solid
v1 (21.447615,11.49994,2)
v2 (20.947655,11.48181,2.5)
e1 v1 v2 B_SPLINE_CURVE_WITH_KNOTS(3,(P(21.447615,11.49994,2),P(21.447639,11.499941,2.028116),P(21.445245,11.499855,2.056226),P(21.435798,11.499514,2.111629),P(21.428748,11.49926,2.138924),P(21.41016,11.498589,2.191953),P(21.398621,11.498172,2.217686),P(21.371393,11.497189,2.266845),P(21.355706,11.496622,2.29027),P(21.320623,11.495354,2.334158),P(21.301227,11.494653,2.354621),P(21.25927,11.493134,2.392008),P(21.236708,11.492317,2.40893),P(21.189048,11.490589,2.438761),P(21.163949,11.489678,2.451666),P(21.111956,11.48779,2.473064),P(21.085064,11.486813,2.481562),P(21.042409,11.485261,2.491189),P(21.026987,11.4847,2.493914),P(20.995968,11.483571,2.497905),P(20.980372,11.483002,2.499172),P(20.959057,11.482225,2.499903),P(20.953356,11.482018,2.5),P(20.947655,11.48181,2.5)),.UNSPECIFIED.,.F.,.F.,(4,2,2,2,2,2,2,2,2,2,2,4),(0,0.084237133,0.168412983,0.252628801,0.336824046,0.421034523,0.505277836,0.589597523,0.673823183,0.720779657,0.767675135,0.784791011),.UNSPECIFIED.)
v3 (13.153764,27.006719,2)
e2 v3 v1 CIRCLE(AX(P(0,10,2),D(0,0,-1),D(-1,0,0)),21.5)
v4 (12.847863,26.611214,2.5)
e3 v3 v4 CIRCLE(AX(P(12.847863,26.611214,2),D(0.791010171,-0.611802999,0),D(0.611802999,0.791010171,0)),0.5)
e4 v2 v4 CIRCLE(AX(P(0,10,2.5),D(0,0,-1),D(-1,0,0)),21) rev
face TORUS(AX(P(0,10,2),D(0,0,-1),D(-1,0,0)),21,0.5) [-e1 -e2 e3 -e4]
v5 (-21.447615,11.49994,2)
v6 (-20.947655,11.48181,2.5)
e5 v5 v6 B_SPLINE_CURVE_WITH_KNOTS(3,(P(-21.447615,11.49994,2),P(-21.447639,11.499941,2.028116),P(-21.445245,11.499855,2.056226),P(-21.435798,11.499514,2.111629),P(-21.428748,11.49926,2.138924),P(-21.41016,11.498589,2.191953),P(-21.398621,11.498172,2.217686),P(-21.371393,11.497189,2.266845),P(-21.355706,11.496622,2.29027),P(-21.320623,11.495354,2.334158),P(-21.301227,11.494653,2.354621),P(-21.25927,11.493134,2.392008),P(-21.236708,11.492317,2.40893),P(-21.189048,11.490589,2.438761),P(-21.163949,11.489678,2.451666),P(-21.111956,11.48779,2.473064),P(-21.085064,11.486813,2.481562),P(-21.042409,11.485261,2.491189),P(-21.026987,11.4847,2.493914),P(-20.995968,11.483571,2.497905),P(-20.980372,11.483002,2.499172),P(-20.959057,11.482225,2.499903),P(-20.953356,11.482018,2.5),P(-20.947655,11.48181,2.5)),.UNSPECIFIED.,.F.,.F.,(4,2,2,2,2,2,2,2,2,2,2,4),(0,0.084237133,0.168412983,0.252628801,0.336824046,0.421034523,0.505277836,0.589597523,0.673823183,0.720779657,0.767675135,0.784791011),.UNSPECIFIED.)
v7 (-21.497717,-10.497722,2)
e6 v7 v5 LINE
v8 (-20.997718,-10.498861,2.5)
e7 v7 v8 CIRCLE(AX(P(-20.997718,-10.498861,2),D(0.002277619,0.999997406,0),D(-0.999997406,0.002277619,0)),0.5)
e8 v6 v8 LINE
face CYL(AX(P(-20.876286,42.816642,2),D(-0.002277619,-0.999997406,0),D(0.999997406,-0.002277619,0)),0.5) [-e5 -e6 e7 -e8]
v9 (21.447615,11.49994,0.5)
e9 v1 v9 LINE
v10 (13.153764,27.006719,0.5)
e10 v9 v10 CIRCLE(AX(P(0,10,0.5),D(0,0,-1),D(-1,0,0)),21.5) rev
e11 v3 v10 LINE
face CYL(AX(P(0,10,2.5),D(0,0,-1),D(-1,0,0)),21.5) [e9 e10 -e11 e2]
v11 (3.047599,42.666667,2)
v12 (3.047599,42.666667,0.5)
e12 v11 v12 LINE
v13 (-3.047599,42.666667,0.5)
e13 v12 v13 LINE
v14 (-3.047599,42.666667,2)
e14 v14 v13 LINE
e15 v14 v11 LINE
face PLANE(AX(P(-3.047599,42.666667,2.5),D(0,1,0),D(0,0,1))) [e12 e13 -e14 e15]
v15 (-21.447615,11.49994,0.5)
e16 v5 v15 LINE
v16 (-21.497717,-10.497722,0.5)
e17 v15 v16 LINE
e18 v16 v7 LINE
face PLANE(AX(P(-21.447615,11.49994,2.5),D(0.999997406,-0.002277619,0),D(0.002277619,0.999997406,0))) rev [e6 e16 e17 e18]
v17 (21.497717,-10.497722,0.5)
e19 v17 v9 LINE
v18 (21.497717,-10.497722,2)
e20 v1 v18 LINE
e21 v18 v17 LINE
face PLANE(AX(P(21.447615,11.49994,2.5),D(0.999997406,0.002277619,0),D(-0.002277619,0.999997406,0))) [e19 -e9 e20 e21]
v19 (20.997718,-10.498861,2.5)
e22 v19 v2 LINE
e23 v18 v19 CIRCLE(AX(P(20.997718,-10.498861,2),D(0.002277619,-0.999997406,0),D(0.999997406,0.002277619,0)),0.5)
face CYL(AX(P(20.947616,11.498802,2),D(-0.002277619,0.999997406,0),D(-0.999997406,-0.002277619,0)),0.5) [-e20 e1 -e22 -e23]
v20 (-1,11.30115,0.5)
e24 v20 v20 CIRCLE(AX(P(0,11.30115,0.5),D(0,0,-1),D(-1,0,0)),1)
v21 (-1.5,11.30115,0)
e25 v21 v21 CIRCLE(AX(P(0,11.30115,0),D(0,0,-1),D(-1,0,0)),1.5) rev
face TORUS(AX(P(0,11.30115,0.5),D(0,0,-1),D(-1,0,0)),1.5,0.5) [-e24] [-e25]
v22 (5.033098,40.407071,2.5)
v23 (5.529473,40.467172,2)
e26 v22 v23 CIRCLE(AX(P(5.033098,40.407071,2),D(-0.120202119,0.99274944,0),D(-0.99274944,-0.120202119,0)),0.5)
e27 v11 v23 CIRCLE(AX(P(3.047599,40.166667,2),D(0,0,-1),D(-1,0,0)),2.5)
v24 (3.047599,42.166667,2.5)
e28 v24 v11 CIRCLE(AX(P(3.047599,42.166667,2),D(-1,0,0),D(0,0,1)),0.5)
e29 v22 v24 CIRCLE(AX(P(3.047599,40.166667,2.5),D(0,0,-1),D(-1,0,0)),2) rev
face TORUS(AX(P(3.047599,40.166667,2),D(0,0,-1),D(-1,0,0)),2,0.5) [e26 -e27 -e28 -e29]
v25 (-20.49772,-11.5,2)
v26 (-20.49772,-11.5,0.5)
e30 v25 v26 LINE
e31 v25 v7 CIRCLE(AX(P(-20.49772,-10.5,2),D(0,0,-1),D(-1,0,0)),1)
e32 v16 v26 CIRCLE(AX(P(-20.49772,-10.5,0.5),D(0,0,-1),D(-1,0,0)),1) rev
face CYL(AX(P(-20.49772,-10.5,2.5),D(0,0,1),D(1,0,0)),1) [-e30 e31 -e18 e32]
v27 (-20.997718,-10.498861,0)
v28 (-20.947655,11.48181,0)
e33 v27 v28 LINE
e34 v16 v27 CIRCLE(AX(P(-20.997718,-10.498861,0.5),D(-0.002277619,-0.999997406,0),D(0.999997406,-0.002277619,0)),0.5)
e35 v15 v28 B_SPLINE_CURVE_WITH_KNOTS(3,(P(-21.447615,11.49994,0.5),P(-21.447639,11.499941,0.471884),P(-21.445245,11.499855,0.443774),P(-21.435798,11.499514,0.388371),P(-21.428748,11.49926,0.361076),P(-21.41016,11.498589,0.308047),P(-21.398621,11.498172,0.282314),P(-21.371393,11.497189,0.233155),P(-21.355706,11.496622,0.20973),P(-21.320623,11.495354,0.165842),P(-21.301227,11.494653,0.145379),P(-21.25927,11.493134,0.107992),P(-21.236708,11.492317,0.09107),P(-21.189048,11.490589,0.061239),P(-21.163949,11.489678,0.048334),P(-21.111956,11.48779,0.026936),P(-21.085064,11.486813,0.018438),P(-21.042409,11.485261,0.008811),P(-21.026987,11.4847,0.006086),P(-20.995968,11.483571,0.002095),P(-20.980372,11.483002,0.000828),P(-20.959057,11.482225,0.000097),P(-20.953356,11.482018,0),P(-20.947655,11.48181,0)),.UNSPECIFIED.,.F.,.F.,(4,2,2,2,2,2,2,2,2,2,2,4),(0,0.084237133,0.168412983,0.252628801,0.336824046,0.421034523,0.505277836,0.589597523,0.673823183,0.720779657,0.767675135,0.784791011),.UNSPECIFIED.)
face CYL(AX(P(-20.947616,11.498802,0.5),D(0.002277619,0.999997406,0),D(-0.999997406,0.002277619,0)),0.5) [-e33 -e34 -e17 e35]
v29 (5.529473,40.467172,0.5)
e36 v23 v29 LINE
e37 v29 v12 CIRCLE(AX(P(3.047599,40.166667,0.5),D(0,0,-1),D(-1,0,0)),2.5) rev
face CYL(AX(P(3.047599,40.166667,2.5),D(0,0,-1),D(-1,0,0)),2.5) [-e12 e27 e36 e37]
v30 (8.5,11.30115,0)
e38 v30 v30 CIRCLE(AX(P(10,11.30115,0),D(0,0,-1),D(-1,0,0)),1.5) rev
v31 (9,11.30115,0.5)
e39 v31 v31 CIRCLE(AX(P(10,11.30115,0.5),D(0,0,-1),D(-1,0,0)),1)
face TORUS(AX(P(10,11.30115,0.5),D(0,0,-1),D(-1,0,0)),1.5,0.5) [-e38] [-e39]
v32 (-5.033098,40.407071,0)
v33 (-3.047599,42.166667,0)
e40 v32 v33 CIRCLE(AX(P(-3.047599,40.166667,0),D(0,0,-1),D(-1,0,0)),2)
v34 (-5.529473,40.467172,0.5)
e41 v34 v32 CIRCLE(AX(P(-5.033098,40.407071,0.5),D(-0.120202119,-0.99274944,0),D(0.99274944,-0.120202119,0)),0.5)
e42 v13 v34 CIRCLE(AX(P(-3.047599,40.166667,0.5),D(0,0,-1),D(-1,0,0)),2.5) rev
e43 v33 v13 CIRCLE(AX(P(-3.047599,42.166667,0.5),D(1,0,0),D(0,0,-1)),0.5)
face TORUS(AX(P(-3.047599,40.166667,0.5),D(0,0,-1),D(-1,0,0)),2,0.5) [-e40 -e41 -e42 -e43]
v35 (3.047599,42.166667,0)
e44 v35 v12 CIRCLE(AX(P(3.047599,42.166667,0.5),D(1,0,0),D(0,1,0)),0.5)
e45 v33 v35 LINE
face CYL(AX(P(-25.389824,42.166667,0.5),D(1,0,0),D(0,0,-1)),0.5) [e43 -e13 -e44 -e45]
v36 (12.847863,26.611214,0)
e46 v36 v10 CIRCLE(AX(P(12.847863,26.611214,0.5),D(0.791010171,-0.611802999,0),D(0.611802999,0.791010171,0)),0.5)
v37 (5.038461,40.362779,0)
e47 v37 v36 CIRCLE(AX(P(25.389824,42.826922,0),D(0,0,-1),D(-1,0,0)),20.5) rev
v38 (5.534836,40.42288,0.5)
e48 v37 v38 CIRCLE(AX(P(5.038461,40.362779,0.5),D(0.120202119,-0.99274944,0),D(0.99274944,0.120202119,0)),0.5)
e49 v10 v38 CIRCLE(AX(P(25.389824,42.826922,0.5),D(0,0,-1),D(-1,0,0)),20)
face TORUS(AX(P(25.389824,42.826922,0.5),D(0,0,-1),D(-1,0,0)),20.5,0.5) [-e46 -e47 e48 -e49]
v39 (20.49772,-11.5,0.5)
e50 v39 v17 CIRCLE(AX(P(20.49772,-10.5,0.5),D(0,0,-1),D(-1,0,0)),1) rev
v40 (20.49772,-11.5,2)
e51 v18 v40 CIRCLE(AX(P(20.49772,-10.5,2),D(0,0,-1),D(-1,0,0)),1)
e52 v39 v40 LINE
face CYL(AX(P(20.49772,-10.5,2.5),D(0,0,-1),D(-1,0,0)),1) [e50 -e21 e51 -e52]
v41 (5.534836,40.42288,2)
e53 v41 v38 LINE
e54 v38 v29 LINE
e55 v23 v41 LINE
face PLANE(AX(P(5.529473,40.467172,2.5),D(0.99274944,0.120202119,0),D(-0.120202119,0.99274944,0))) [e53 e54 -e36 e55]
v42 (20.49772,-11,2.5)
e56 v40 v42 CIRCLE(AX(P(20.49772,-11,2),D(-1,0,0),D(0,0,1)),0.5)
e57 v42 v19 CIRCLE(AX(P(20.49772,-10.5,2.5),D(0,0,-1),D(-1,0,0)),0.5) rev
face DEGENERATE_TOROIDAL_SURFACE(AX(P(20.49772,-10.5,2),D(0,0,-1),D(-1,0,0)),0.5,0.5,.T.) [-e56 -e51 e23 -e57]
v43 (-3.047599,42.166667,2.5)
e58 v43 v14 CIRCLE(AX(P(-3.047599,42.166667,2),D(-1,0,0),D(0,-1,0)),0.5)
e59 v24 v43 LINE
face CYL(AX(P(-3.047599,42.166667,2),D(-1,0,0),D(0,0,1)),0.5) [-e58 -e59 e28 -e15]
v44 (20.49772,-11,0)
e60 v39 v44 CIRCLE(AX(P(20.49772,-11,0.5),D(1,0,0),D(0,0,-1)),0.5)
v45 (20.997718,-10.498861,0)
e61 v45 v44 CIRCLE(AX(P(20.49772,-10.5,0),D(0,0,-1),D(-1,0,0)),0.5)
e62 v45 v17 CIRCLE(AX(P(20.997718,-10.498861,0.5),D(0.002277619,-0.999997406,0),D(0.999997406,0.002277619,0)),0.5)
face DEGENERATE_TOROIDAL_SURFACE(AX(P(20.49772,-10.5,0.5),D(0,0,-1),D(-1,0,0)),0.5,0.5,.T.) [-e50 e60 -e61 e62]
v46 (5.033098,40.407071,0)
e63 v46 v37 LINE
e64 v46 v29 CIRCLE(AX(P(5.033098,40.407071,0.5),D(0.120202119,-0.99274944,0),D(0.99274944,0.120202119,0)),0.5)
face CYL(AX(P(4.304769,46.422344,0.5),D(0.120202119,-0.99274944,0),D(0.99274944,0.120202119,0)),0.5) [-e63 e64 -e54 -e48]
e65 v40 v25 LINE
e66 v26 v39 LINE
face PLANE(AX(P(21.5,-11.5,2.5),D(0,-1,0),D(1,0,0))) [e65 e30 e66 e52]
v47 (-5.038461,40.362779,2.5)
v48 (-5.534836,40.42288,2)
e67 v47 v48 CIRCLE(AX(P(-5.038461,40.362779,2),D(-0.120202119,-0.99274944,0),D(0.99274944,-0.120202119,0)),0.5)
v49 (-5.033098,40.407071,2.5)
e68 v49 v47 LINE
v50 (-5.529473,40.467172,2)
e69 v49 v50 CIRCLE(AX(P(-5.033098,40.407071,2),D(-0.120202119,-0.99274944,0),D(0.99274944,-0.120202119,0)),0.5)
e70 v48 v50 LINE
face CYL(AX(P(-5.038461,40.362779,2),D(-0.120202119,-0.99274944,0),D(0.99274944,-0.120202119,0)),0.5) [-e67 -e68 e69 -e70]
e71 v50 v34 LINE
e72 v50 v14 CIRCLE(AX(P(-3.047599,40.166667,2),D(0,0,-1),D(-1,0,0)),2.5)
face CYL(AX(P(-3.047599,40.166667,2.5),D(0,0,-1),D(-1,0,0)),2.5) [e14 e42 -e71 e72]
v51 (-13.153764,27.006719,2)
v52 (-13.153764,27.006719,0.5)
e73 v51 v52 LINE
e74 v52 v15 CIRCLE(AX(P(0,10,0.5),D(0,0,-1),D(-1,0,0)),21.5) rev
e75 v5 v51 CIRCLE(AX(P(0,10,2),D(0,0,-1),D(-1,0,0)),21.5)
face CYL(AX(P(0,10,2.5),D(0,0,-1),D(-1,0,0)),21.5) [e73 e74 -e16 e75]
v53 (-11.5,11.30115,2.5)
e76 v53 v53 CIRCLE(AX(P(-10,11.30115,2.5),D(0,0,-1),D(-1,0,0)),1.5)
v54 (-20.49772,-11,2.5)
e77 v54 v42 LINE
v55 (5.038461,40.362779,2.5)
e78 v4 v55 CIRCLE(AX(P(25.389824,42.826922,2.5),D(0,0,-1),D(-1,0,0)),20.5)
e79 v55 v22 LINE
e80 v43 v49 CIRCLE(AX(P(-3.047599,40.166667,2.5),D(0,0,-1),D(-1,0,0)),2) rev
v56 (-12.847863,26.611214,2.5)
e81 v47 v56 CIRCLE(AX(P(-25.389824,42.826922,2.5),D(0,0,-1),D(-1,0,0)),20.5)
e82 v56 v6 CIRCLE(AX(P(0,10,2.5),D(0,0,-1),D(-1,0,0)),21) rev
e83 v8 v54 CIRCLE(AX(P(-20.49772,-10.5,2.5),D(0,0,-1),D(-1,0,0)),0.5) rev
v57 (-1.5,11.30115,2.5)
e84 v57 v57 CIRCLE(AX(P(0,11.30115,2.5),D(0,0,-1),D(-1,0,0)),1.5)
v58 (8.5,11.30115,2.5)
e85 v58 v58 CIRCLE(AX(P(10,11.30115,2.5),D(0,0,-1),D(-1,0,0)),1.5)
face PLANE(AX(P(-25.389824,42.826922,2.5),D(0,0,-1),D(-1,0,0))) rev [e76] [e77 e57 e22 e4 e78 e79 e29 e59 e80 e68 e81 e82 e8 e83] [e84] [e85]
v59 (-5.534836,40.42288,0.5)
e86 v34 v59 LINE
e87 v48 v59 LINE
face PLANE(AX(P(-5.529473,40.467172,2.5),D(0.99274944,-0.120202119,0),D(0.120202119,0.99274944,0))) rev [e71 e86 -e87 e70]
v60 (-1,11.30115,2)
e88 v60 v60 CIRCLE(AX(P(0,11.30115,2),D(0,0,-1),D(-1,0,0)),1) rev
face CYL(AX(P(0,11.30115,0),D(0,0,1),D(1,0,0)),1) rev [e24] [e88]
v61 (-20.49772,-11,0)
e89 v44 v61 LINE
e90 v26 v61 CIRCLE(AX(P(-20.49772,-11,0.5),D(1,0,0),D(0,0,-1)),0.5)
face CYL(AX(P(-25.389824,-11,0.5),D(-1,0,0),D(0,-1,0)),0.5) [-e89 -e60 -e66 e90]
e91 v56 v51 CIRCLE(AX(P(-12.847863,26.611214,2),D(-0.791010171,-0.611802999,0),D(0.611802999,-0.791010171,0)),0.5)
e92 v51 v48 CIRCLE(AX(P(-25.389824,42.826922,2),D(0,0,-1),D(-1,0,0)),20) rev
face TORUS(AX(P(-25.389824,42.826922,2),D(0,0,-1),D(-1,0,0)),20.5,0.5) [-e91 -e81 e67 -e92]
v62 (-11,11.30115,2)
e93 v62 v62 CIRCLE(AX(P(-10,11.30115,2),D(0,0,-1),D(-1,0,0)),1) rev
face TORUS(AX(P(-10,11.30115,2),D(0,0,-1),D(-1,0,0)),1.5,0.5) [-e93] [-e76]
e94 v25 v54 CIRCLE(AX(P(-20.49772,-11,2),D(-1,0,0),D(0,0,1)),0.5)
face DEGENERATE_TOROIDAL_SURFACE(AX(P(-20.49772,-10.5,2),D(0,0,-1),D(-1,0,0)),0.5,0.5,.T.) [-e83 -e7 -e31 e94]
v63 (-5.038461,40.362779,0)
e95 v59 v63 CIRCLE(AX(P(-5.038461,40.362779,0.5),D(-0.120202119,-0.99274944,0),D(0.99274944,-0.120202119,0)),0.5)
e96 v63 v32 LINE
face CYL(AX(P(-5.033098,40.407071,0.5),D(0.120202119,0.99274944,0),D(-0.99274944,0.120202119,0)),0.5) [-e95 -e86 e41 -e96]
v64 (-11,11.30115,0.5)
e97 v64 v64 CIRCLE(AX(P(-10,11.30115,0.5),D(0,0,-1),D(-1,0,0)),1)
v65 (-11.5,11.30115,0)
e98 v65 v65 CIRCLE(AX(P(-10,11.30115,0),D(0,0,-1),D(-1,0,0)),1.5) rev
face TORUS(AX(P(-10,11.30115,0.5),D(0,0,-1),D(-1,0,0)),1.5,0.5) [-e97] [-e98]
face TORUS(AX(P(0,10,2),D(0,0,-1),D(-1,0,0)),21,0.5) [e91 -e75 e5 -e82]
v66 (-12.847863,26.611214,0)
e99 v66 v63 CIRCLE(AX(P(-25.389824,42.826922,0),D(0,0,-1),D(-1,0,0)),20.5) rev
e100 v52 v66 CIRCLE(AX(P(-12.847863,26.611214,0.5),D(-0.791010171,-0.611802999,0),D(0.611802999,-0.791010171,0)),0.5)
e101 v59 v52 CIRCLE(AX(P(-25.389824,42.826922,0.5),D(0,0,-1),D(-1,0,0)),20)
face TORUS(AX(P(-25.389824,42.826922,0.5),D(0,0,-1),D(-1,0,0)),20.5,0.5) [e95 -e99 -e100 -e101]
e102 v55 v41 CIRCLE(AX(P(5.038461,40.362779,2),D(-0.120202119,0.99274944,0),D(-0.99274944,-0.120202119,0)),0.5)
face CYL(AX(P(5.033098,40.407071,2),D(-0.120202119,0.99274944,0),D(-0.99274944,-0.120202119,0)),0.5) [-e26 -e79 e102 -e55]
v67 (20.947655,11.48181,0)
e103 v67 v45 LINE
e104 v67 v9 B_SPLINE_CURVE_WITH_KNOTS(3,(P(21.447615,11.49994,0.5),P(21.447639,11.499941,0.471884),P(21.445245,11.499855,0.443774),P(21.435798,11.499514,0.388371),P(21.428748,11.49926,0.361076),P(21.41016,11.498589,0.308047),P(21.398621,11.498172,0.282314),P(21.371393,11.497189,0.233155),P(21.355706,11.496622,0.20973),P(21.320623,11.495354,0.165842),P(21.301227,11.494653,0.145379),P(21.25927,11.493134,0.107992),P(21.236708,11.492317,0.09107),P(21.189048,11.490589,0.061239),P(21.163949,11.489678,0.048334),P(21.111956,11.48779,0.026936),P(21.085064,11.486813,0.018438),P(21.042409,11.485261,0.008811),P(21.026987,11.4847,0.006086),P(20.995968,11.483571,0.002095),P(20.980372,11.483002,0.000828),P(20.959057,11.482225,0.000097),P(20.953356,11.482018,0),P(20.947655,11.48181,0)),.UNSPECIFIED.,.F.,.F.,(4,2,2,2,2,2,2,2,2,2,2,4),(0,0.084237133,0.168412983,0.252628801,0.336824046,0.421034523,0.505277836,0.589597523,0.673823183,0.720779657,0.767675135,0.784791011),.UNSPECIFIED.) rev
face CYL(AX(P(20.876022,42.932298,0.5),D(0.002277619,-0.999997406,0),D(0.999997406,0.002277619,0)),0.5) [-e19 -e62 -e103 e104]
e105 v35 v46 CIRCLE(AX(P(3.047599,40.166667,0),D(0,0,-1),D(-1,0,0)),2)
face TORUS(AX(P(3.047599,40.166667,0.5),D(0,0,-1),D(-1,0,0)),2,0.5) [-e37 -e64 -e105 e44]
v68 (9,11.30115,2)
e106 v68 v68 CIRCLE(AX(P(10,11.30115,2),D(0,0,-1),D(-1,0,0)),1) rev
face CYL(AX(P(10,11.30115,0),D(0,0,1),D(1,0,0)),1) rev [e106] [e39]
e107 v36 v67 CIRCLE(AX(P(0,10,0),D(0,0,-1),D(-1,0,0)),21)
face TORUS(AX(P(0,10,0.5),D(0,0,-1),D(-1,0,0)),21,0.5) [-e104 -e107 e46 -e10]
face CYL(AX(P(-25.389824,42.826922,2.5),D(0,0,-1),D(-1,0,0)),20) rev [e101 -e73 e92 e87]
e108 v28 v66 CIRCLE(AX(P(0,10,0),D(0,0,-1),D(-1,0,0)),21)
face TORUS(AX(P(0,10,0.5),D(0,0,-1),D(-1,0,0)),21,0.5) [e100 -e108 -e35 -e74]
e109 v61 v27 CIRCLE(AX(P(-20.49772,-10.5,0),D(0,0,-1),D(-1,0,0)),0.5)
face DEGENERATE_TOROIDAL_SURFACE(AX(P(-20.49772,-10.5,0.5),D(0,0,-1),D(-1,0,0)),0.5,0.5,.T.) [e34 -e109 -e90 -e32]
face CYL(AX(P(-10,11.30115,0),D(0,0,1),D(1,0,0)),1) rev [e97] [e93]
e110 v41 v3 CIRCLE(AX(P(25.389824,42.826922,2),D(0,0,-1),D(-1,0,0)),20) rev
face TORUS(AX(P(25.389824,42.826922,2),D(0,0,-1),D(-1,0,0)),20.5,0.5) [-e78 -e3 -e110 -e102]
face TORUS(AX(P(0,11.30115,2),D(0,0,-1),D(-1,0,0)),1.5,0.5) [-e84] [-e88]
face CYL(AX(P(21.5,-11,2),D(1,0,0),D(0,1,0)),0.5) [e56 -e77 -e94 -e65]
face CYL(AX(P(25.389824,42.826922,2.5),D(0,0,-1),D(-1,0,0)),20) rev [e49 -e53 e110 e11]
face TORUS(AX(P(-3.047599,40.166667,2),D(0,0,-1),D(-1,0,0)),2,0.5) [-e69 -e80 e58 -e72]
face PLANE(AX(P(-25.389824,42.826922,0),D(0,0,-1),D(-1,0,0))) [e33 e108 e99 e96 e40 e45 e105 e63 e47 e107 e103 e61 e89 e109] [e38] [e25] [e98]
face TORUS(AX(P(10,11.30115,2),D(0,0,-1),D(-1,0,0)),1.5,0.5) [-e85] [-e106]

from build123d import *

# Parameters (mm, degrees)
BOSS_EXTRUDE1_DEPTH = 2.5
SKETCH3_R           = 1
CUT_EXTRUDE1_DEPTH  = 2.5
FILLET1_R           = 1
FILLET2_R           = 0.5
FILLET3_R           = 0.5


with BuildPart() as part:
    # Sketch2 → Boss-Extrude1 (new body)
    with BuildSketch(Plane.XY):
        with BuildLine():
            Line((-21.447614762, 11.499940343), (-21.5, -11.5))
            Line((-21.5, -11.5), (21.5, -11.5))
            Line((21.5, -11.5), (21.447614762, 11.499940343))
            ThreePointArc((21.447614762, 11.499940343), (18.95861031, 20.140073724), (13.153764478, 27.006718674))
            ThreePointArc((13.153764478, 27.006718674), (7.998527865, 32.950546095), (5.534835658, 40.422879711))
            Line((5.534835658, 40.422879711), (5.529472751, 40.467171964))
            ThreePointArc((5.529472751, 40.467171964), (4.705721094, 42.037664161), (3.047599151, 42.666666667))
            Line((3.047599151, 42.666666667), (-3.047599151, 42.666666667))
            ThreePointArc((-3.047599151, 42.666666667), (-4.705721094, 42.037664161), (-5.529472751, 40.467171964))
            Line((-5.529472751, 40.467171964), (-5.534835658, 40.422879711))
            ThreePointArc((-5.534835658, 40.422879711), (-7.998527865, 32.950546095), (-13.153764478, 27.006718674))
            ThreePointArc((-13.153764478, 27.006718674), (-18.95861031, 20.140073724), (-21.447614762, 11.499940343))
        make_face()
    extrude(amount=BOSS_EXTRUDE1_DEPTH)

    # Sketch3 → Cut-Extrude1 (cut)
    with BuildSketch(Plane.XY.offset(2.5)):
        with Locations((0, 11.301150259)):
            Circle(SKETCH3_R)
        with Locations((10, 11.301150259)):
            Circle(SKETCH3_R)
        with Locations((-10, 11.301150259)):
            Circle(SKETCH3_R)
    extrude(amount=-CUT_EXTRUDE1_DEPTH, mode=Mode.SUBTRACT)

    # Fillet1
    fillet1_edges = [part.edges().sort_by_distance(p)[0] for p in [
        (21.5, -11.5, 1.25),
        (-21.5, -11.5, 1.25),
    ]]
    fillet(fillet1_edges, radius=FILLET1_R)

    # Fillet2
    # the kernel refuses this fillet: 0.5 mm, written as the material it takes off along each edge
    with BuildSketch(Plane(origin=(0, 10, 2.5), x_dir=(-0.6118029989647665, 0.7910101708939764, 0), z_dir=(0.7910101708939764, 0.6118029989647665, 0))) as fillet2_piece_1:
        with BuildLine():
            CenterArc((21.5 - FILLET2_R, -FILLET2_R), FILLET2_R, 0, 90)
            Line((21.5 - FILLET2_R, 0), (21.5, 0))
            Line((21.5, 0), (21.5, -FILLET2_R))
        make_face()
    revolve(axis=Axis((0, 10, 2.5), (0, 0, 1)), revolution_arc=51.611078363, mode=Mode.SUBTRACT)
    with BuildSketch(Plane(origin=(-21.444767738, 12.749937101, 2.5), x_dir=(0, 0, -1), z_dir=(-0.0022776190557038953, -0.9999974062223548, 0))) as fillet2_piece_2:
        with BuildLine():
            CenterArc((FILLET2_R, FILLET2_R), FILLET2_R, 180, 90)
            Line((0, FILLET2_R), (0, 0))
            Line((0, 0), (FILLET2_R, 0))
        make_face()
    extrude(amount=23.247719781, mode=Mode.SUBTRACT)
    with BuildSketch(Plane(origin=(21.497717187, -10.497722381, 2.5), x_dir=(-0.9999974062223547, -0.002277619055703895, 0), z_dir=(-0.0022776190557038953, 0.9999974062223548, 0))) as fillet2_piece_3:
        with BuildLine():
            CenterArc((FILLET2_R, -FILLET2_R), FILLET2_R, 90, 90)
            Line((0, -FILLET2_R), (0, 0))
            Line((0, 0), (FILLET2_R, 0))
        make_face()
    extrude(amount=23.247719781, mode=Mode.SUBTRACT)
    with BuildSketch(Plane(origin=(0, 10, 2.5), x_dir=(0.999931846454531, 0.011674863854978535, 0), z_dir=(0.011674863854978535, -0.999931846454531, 0))) as fillet2_piece_4:
        with BuildLine():
            CenterArc((21.5 - FILLET2_R, -FILLET2_R), FILLET2_R, 0, 90)
            Line((21.5, -FILLET2_R), (21.5, 0))
            Line((21.5, 0), (21.5 - FILLET2_R, 0))
        make_face()
    revolve(axis=Axis((0, 10, 2.5), (0, 0, 1)), revolution_arc=51.611078363, mode=Mode.SUBTRACT)
    with BuildSketch(Plane(origin=(25.389824457, 42.826922092, 2.5), x_dir=(-0.6118029989647666, -0.7910101708939764, 0), z_dir=(0.7910101708939764, -0.6118029989647666, 0))) as fillet2_piece_5:
        with BuildLine():
            CenterArc((20 + FILLET2_R, FILLET2_R), FILLET2_R, 180, 90)
            Line((20, FILLET2_R), (20, 0))
            Line((20, 0), (20 + FILLET2_R, 0))
        make_face()
    revolve(axis=Axis((25.389824457, 42.826922092, 2.5), (0, 0, -1)), revolution_arc=45.3762464, mode=Mode.SUBTRACT)
    with BuildSketch(Plane(origin=(5.534835658, 40.422879711, 2.5), x_dir=(-0.9927494399740624, -0.12020211907943115, 0), z_dir=(-0.12020211907943114, 0.9927494399740623, 0)), Plane(origin=(-5.529472751, 40.467171964, 2.5), x_dir=(0.9927494399740623, -0.1202021190794305, 0), z_dir=(-0.12020211907943051, -0.9927494399740624, 0))) as fillet2_piece_6:
        with BuildLine():
            CenterArc((FILLET2_R, -FILLET2_R), FILLET2_R, 90, 90)
            Line((0, -FILLET2_R), (0, 0))
            Line((0, 0), (FILLET2_R, 0))
        make_face()
    extrude(amount=0.044615743, mode=Mode.SUBTRACT)
    with BuildSketch(Plane(origin=(-10, 11.301150259, 2.5), x_dir=(1, 0, 0), z_dir=(0, -1, 0))) as fillet2_piece_7:
        with BuildLine():
            CenterArc((1 + FILLET2_R, -FILLET2_R), FILLET2_R, 90, 90)
            Line((1, -FILLET2_R), (1, 0))
            Line((1, 0), (1 + FILLET2_R, 0))
        make_face()
    revolve(axis=Axis((-10, 11.301150259, 2.5), (0, 0, 1)), mode=Mode.SUBTRACT)
    with BuildSketch(Plane(origin=(10, 11.301150259, 2.5), x_dir=(1, 0, 0), z_dir=(0, -1, 0))) as fillet2_piece_8:
        with BuildLine():
            CenterArc((1 + FILLET2_R, -FILLET2_R), FILLET2_R, 90, 90)
            Line((1, -FILLET2_R), (1, 0))
            Line((1, 0), (1 + FILLET2_R, 0))
        make_face()
    revolve(axis=Axis((10, 11.301150259, 2.5), (0, 0, 1)), mode=Mode.SUBTRACT)
    with BuildSketch(Plane(origin=(3.047599151, 40.166666667, 2.5), x_dir=(0.9927494399740617, 0.12020211907943634, 0), z_dir=(0.12020211907943634, -0.9927494399740617, 0))) as fillet2_piece_9:
        with BuildLine():
            CenterArc((2.5 - FILLET2_R, -FILLET2_R), FILLET2_R, 0, 90)
            Line((2.5, -FILLET2_R), (2.5, 0))
            Line((2.5, 0), (2.5 - FILLET2_R, 0))
        make_face()
    revolve(axis=Axis((3.047599151, 40.166666667, 2.5), (0, 0, 1)), revolution_arc=83.096232415, mode=Mode.SUBTRACT)
    with BuildSketch(Plane(origin=(0, 11.301150259, 2.5), x_dir=(1, 0, 0), z_dir=(0, -1, 0))) as fillet2_piece_10:
        with BuildLine():
            CenterArc((1 + FILLET2_R, -FILLET2_R), FILLET2_R, 90, 90)
            Line((1, -FILLET2_R), (1, 0))
            Line((1, 0), (1 + FILLET2_R, 0))
        make_face()
    revolve(axis=Axis((0, 11.301150259, 2.5), (0, 0, 1)), mode=Mode.SUBTRACT)
    with BuildSketch(Plane(origin=(3.047599151, 42.666666667, 2.5), x_dir=(0, -1, 0), z_dir=(-1, 0, 0))) as fillet2_piece_11:
        with BuildLine():
            CenterArc((FILLET2_R, -FILLET2_R), FILLET2_R, 90, 90)
            Line((0, -FILLET2_R), (0, 0))
            Line((0, 0), (FILLET2_R, 0))
        make_face()
    extrude(amount=6.095198302, mode=Mode.SUBTRACT)
    with BuildSketch(Plane(origin=(-20.497719781, -11.5, 2.5), x_dir=(0, 1, 0), z_dir=(1, 0, 0))) as fillet2_piece_12:
        with BuildLine():
            CenterArc((FILLET2_R, -FILLET2_R), FILLET2_R, 90, 90)
            Line((0, -FILLET2_R), (0, 0))
            Line((0, 0), (FILLET2_R, 0))
        make_face()
    extrude(amount=40.995439563, mode=Mode.SUBTRACT)
    with BuildSketch(Plane(origin=(-3.047599151, 40.166666667, 2.5), x_dir=(0, 1, 0), z_dir=(1, 0, 0))) as fillet2_piece_13:
        with BuildLine():
            CenterArc((2.5 - FILLET2_R, -FILLET2_R), FILLET2_R, 0, 90)
            Line((2.5, -FILLET2_R), (2.5, 0))
            Line((2.5, 0), (2.5 - FILLET2_R, 0))
        make_face()
    revolve(axis=Axis((-3.047599151, 40.166666667, 2.5), (0, 0, 1)), revolution_arc=83.096232415, mode=Mode.SUBTRACT)
    with BuildSketch(Plane(origin=(20.497719781, -10.5, 2.5), x_dir=(0, -1, 0), z_dir=(-1, 0, 0))) as fillet2_piece_14:
        with BuildLine():
            CenterArc((1 - FILLET2_R, -FILLET2_R), FILLET2_R, 0, 90)
            Line((1, -FILLET2_R), (1, 0))
            Line((1, 0), (1 - FILLET2_R, 0))
        make_face()
    revolve(axis=Axis((20.497719781, -10.5, 2.5), (0, 0, 1)), revolution_arc=90.130498072, mode=Mode.SUBTRACT)
    with BuildSketch(Plane(origin=(-20.497719781, -10.5, 2.5), x_dir=(-0.9999974062223547, 0.002277619055705668, 0), z_dir=(0.002277619055705668, 0.9999974062223547, 0))) as fillet2_piece_15:
        with BuildLine():
            CenterArc((1 - FILLET2_R, -FILLET2_R), FILLET2_R, 0, 90)
            Line((1 - FILLET2_R, 0), (1, 0))
            Line((1, 0), (1, -FILLET2_R))
        make_face()
    revolve(axis=Axis((-20.497719781, -10.5, 2.5), (0, 0, 1)), revolution_arc=90.130498072, mode=Mode.SUBTRACT)
    with BuildSketch(Plane(origin=(-25.389824457, 42.826922092, 2.5), x_dir=(0.9927494399740615, -0.12020211907943686, 0), z_dir=(0.12020211907943686, 0.9927494399740615, 0))) as fillet2_piece_16:
        with BuildLine():
            CenterArc((20 + FILLET2_R, FILLET2_R), FILLET2_R, 180, 90)
            Line((20, FILLET2_R), (20, 0))
            Line((20, 0), (20 + FILLET2_R, 0))
        make_face()
    revolve(axis=Axis((-25.389824457, 42.826922092, 2.5), (0, 0, -1)), revolution_arc=45.3762464, mode=Mode.SUBTRACT)

    # Fillet3
    # the kernel refuses this fillet: 0.5 mm, written as the material it takes off along each edge
    with BuildSketch(Plane(origin=(-3.047599151, 40.166666667, 0), x_dir=(0, 1, 0), z_dir=(1, 0, 0))) as fillet3_piece_1:
        with BuildLine():
            CenterArc((2.5 - FILLET3_R, FILLET3_R), FILLET3_R, 270, 90)
            Line((2.5, FILLET3_R), (2.5, 0))
            Line((2.5, 0), (2.5 - FILLET3_R, 0))
        make_face()
    revolve(axis=Axis((-3.047599151, 40.166666667, 0), (0, 0, 1)), revolution_arc=83.096232415, mode=Mode.SUBTRACT)
    with BuildSketch(Plane(origin=(3.047599151, 42.666666667, 0), x_dir=(0, -1, 0), z_dir=(-1, 0, 0))) as fillet3_piece_2:
        with BuildLine():
            CenterArc((FILLET3_R, FILLET3_R), FILLET3_R, 180, 90)
            Line((0, FILLET3_R), (0, 0))
            Line((0, 0), (FILLET3_R, 0))
        make_face()
    extrude(amount=6.095198302, mode=Mode.SUBTRACT)
    with BuildSketch(Plane(origin=(3.047599151, 40.166666667, 0), x_dir=(0.9927494399740617, 0.12020211907943634, 0), z_dir=(0.12020211907943634, -0.9927494399740617, 0))) as fillet3_piece_3:
        with BuildLine():
            CenterArc((2.5 - FILLET3_R, FILLET3_R), FILLET3_R, 270, 90)
            Line((2.5, FILLET3_R), (2.5, 0))
            Line((2.5, 0), (2.5 - FILLET3_R, 0))
        make_face()
    revolve(axis=Axis((3.047599151, 40.166666667, 0), (0, 0, 1)), revolution_arc=83.096232415, mode=Mode.SUBTRACT)
    with BuildSketch(Plane(origin=(5.534835658, 40.422879711, 0), x_dir=(-0.9927494399740624, -0.12020211907943115, 0), z_dir=(-0.12020211907943114, 0.9927494399740623, 0)), Plane(origin=(-5.529472751, 40.467171964, 0), x_dir=(0.9927494399740623, -0.1202021190794305, 0), z_dir=(-0.12020211907943051, -0.9927494399740624, 0))) as fillet3_piece_4:
        with BuildLine():
            CenterArc((FILLET3_R, FILLET3_R), FILLET3_R, 180, 90)
            Line((0, FILLET3_R), (0, 0))
            Line((0, 0), (FILLET3_R, 0))
        make_face()
    extrude(amount=0.044615743, mode=Mode.SUBTRACT)
    with BuildSketch(Plane(origin=(25.389824457, 42.826922092, 0), x_dir=(-0.6118029989647666, -0.7910101708939764, 0), z_dir=(0.7910101708939764, -0.6118029989647666, 0))) as fillet3_piece_5:
        with BuildLine():
            CenterArc((20 + FILLET3_R, -FILLET3_R), FILLET3_R, 90, 90)
            Line((20, -FILLET3_R), (20, 0))
            Line((20, 0), (20 + FILLET3_R, 0))
        make_face()
    revolve(axis=Axis((25.389824457, 42.826922092, 0), (0, 0, -1)), revolution_arc=45.3762464, mode=Mode.SUBTRACT)
    with BuildSketch(Plane(origin=(0, 10, 0), x_dir=(0.999931846454531, 0.011674863854978535, 0), z_dir=(0.011674863854978535, -0.999931846454531, 0))) as fillet3_piece_6:
        with BuildLine():
            CenterArc((21.5 - FILLET3_R, FILLET3_R), FILLET3_R, 270, 90)
            Line((21.5, FILLET3_R), (21.5, 0))
            Line((21.5, 0), (21.5 - FILLET3_R, 0))
        make_face()
    revolve(axis=Axis((0, 10, 0), (0, 0, 1)), revolution_arc=51.611078363, mode=Mode.SUBTRACT)
    with BuildSketch(Plane(origin=(21.497717187, -10.497722381, 0), x_dir=(-0.9999974062223547, -0.002277619055703895, 0), z_dir=(-0.0022776190557038953, 0.9999974062223548, 0))) as fillet3_piece_7:
        with BuildLine():
            CenterArc((FILLET3_R, FILLET3_R), FILLET3_R, 180, 90)
            Line((0, FILLET3_R), (0, 0))
            Line((0, 0), (FILLET3_R, 0))
        make_face()
    extrude(amount=23.247719781, mode=Mode.SUBTRACT)
    with BuildSketch(Plane(origin=(-21.444767738, 12.749937101, 0), x_dir=(0, 0, 1), z_dir=(-0.0022776190557038953, -0.9999974062223548, 0))) as fillet3_piece_8:
        with BuildLine():
            CenterArc((FILLET3_R, -FILLET3_R), FILLET3_R, 90, 90)
            Line((0, -FILLET3_R), (0, 0))
            Line((0, 0), (FILLET3_R, 0))
        make_face()
    extrude(amount=23.247719781, mode=Mode.SUBTRACT)
    with BuildSketch(Plane(origin=(0, 10, 0), x_dir=(-0.6118029989647665, 0.7910101708939764, 0), z_dir=(0.7910101708939764, 0.6118029989647665, 0))) as fillet3_piece_9:
        with BuildLine():
            CenterArc((21.5 - FILLET3_R, FILLET3_R), FILLET3_R, 270, 90)
            Line((21.5 - FILLET3_R, 0), (21.5, 0))
            Line((21.5, 0), (21.5, FILLET3_R))
        make_face()
    revolve(axis=Axis((0, 10, 0), (0, 0, 1)), revolution_arc=51.611078363, mode=Mode.SUBTRACT)
    with BuildSketch(Plane(origin=(-25.389824457, 42.826922092, 0), x_dir=(0.9927494399740615, -0.12020211907943686, 0), z_dir=(0.12020211907943686, 0.9927494399740615, 0))) as fillet3_piece_10:
        with BuildLine():
            CenterArc((20 + FILLET3_R, -FILLET3_R), FILLET3_R, 90, 90)
            Line((20, -FILLET3_R), (20, 0))
            Line((20, 0), (20 + FILLET3_R, 0))
        make_face()
    revolve(axis=Axis((-25.389824457, 42.826922092, 0), (0, 0, -1)), revolution_arc=45.3762464, mode=Mode.SUBTRACT)
    with BuildSketch(Plane(origin=(-10, 11.301150259, 0), x_dir=(1, 0, 0), z_dir=(0, -1, 0))) as fillet3_piece_11:
        with BuildLine():
            CenterArc((1 + FILLET3_R, FILLET3_R), FILLET3_R, 180, 90)
            Line((1, FILLET3_R), (1, 0))
            Line((1, 0), (1 + FILLET3_R, 0))
        make_face()
    revolve(axis=Axis((-10, 11.301150259, 0), (0, 0, 1)), mode=Mode.SUBTRACT)
    with BuildSketch(Plane(origin=(10, 11.301150259, 0), x_dir=(1, 0, 0), z_dir=(0, -1, 0))) as fillet3_piece_12:
        with BuildLine():
            CenterArc((1 + FILLET3_R, FILLET3_R), FILLET3_R, 180, 90)
            Line((1, FILLET3_R), (1, 0))
            Line((1, 0), (1 + FILLET3_R, 0))
        make_face()
    revolve(axis=Axis((10, 11.301150259, 0), (0, 0, 1)), mode=Mode.SUBTRACT)
    with BuildSketch(Plane(origin=(0, 11.301150259, 0), x_dir=(1, 0, 0), z_dir=(0, -1, 0))) as fillet3_piece_13:
        with BuildLine():
            CenterArc((1 + FILLET3_R, FILLET3_R), FILLET3_R, 180, 90)
            Line((1, FILLET3_R), (1, 0))
            Line((1, 0), (1 + FILLET3_R, 0))
        make_face()
    revolve(axis=Axis((0, 11.301150259, 0), (0, 0, 1)), mode=Mode.SUBTRACT)
    with BuildSketch(Plane(origin=(-20.497719781, -11.5, 0), x_dir=(0, 1, 0), z_dir=(1, 0, 0))) as fillet3_piece_14:
        with BuildLine():
            CenterArc((FILLET3_R, FILLET3_R), FILLET3_R, 180, 90)
            Line((0, FILLET3_R), (0, 0))
            Line((0, 0), (FILLET3_R, 0))
        make_face()
    extrude(amount=40.995439563, mode=Mode.SUBTRACT)
    with BuildSketch(Plane(origin=(20.497719781, -10.5, 0), x_dir=(0, -1, 0), z_dir=(-1, 0, 0))) as fillet3_piece_15:
        with BuildLine():
            CenterArc((1 - FILLET3_R, FILLET3_R), FILLET3_R, 270, 90)
            Line((1, FILLET3_R), (1, 0))
            Line((1, 0), (1 - FILLET3_R, 0))
        make_face()
    revolve(axis=Axis((20.497719781, -10.5, 0), (0, 0, 1)), revolution_arc=90.130498072, mode=Mode.SUBTRACT)
    with BuildSketch(Plane(origin=(-20.497719781, -10.5, 0), x_dir=(-0.9999974062223547, 0.002277619055705668, 0), z_dir=(0.002277619055705668, 0.9999974062223547, 0))) as fillet3_piece_16:
        with BuildLine():
            CenterArc((1 - FILLET3_R, FILLET3_R), FILLET3_R, 270, 90)
            Line((1 - FILLET3_R, 0), (1, 0))
            Line((1, 0), (1, FILLET3_R))
        make_face()
    revolve(axis=Axis((-20.497719781, -10.5, 0), (0, 0, 1)), revolution_arc=90.130498072, mode=Mode.SUBTRACT)


solid = part.part
